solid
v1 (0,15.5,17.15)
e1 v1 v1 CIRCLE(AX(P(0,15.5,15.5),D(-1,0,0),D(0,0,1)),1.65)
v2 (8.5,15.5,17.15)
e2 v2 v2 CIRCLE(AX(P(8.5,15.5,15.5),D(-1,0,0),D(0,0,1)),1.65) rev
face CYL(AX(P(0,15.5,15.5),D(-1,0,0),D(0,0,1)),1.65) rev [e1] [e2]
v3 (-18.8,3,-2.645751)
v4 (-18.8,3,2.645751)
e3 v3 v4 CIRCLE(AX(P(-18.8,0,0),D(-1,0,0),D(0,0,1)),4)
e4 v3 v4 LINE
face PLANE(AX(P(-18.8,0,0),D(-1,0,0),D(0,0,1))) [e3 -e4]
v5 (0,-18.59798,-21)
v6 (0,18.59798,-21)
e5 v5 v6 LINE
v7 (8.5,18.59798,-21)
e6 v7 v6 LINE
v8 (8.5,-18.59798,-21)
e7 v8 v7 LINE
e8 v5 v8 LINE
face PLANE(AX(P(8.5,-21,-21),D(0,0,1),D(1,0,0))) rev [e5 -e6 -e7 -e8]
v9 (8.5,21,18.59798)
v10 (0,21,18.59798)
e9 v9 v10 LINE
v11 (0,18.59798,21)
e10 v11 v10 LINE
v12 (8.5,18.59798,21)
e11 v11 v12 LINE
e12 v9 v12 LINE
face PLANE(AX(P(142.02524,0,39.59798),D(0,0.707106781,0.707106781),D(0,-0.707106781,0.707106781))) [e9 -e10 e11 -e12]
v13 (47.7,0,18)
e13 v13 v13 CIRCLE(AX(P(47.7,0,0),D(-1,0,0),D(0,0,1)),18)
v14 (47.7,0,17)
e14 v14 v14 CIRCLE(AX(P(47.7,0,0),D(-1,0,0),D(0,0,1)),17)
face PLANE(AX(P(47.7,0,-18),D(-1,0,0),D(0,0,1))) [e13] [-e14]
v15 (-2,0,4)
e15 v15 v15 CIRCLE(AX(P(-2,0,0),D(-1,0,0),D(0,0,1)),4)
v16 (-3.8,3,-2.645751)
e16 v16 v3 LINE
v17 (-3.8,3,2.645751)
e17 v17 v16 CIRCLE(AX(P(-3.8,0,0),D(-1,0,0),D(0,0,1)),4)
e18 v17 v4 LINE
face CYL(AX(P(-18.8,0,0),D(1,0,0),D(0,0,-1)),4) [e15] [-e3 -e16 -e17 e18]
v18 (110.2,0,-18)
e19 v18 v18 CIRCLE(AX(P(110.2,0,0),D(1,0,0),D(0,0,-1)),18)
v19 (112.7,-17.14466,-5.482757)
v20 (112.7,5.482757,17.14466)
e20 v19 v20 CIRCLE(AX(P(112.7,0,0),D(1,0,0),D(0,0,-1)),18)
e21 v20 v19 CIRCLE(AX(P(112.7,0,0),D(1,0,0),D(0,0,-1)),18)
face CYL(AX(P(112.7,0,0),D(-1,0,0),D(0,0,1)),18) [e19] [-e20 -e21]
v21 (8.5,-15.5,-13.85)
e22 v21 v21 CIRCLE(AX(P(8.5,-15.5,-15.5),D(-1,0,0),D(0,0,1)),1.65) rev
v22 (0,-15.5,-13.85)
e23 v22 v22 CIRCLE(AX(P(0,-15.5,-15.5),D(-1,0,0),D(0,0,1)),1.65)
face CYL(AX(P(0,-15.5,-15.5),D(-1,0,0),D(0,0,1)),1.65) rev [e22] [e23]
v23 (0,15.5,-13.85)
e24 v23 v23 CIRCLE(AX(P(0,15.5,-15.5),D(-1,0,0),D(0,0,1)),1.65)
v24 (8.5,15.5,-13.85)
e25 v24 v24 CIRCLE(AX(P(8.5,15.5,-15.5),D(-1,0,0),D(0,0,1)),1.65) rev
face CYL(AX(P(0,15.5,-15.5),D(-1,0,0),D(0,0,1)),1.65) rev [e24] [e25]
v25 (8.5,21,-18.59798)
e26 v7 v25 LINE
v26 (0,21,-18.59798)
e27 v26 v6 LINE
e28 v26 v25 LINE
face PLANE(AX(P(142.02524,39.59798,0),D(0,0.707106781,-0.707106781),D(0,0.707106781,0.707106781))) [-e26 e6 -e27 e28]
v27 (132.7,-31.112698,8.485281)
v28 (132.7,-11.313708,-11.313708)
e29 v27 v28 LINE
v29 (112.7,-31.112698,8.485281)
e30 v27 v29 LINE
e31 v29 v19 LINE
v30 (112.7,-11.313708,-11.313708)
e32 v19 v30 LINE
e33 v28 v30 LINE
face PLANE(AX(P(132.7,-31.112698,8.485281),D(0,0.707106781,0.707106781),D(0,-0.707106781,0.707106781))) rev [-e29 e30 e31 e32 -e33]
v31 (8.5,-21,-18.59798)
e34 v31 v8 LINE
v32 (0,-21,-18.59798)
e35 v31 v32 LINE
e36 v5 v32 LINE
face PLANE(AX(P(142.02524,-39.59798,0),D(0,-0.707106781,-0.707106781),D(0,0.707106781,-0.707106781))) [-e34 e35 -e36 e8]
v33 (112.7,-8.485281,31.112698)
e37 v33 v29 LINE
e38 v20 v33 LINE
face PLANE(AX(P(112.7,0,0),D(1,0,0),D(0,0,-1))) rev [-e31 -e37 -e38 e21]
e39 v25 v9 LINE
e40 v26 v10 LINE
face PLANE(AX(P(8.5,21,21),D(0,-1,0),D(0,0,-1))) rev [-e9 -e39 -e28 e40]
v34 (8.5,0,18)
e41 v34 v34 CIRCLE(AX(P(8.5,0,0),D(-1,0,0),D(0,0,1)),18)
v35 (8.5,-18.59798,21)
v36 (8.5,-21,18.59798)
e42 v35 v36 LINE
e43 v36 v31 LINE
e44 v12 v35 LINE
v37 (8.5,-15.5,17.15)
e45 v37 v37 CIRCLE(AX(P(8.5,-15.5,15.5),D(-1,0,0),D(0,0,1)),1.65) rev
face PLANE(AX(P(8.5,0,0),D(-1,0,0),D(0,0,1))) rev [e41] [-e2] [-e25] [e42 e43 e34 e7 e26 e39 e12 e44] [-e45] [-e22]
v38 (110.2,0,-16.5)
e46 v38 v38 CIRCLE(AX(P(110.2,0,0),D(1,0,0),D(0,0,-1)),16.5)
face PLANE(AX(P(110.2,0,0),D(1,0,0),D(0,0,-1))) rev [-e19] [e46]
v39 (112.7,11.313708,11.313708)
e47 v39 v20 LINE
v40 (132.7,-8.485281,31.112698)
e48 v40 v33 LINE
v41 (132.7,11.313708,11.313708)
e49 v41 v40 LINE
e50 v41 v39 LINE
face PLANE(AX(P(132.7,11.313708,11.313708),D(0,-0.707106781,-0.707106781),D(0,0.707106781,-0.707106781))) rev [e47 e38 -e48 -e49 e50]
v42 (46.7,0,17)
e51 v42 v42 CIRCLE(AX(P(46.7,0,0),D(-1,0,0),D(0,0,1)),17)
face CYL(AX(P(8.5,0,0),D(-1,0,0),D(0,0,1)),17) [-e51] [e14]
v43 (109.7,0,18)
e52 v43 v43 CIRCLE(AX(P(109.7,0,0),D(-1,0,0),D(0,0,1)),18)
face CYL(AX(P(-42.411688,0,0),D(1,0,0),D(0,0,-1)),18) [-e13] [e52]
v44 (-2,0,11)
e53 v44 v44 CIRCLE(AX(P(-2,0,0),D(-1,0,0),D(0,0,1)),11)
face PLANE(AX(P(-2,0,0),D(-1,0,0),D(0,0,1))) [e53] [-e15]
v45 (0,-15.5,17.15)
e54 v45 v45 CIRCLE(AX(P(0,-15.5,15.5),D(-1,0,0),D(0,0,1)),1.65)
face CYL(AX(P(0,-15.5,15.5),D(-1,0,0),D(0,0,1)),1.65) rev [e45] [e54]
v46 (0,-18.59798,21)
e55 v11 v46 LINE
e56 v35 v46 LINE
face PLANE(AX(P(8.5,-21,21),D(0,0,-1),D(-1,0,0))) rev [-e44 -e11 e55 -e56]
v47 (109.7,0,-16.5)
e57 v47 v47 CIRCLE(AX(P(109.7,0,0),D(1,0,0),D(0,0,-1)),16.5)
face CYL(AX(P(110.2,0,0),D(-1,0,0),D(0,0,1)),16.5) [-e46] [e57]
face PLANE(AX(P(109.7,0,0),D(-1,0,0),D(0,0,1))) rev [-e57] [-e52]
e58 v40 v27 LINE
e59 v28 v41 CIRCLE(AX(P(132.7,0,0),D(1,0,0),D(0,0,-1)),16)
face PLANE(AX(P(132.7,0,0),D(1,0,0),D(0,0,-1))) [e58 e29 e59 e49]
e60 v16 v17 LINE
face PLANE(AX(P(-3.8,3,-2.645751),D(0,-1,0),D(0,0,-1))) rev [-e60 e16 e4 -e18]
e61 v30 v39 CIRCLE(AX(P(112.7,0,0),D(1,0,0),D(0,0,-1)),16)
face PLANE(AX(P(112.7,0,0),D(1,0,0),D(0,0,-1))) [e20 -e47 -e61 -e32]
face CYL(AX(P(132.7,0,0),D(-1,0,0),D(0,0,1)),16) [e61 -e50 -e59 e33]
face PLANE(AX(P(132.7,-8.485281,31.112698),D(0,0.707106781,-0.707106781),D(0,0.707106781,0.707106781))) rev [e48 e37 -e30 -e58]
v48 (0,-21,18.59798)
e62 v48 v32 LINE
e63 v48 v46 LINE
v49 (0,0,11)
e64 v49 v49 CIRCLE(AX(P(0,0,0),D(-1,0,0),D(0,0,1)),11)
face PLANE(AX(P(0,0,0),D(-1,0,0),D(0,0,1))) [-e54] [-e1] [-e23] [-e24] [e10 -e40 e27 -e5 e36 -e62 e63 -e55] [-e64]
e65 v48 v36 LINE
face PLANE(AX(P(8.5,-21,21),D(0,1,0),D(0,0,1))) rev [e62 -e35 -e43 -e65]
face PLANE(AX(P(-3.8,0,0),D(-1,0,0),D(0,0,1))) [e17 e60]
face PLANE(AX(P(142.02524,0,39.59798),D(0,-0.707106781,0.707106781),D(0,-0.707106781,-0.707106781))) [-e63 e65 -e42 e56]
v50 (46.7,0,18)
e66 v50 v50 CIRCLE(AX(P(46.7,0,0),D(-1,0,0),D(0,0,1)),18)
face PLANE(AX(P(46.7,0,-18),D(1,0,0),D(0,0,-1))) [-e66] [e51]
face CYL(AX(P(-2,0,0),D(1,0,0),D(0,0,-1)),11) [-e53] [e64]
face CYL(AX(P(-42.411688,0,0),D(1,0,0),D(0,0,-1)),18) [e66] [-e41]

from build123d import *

# Parameters (mm, degrees)
SKETCH_1_W                 = 42
SKETCH_1_H                 = 42
EXTRUDE_1_DEPTH            = 8.5
SKETCH_2_R                 = 47.208301361
CUT_EXTRUDE_1_DEPTH        = 8.5
SKETCH_3_R                 = 11
EXTRUDE_2_DEPTH            = 2
SKETCH_4_R                 = 4
EXTRUDE_3_DEPTH            = 16.8
CUT_EXTRUDE_START          = -15
CUT_EXTRUDE_2_DEPTH        = 15
SKETCH_7_R                 = 18
EXTRUDE_4_DEPTH            = 101.2
SKETCH_8_R                 = 16.5
EXTRUDE_5_DEPTH            = 0.5
EXTRUDE_START              = 2.5
SKETCH_9_R                 = 18
EXTRUDE_6_DEPTH            = 2.5
EXTRUDE_7_DEPTH            = 20
HOLE_WIZARD_M4_1_D         = 3.3
PATTERN_LINEAR_1_OUTLINE_R = 1.65
PATTERN_LINEAR_1_DEPTH     = 8.5
SKETCH_13_W                = 1
SKETCH_13_H                = 1


# Read off the part's stored shape, not the designer's step: 阵列(线性)1
with BuildPart() as part:
    # 草图1 → 凸台-拉伸1 (new body)
    with BuildSketch(Plane(origin=(0, 0, 0), x_dir=(0, 0, -1), z_dir=(1, 0, 0))):
        Rectangle(SKETCH_1_W, SKETCH_1_H)
    extrude(amount=EXTRUDE_1_DEPTH)

    # 草图2 → 切除-拉伸1 (cut)
    with BuildSketch(Plane.ZY):
        Circle(SKETCH_2_R)
        Polygon((39.597979746, 0), (0, 39.597979746), (-39.597979746, 0), (0, -39.597979746), align=None, mode=Mode.SUBTRACT)
    extrude(amount=-CUT_EXTRUDE_1_DEPTH, mode=Mode.SUBTRACT)

    # 草图3 → 凸台-拉伸2 (add)
    with BuildSketch(Plane.ZY):
        Circle(SKETCH_3_R)
    extrude(amount=EXTRUDE_2_DEPTH)

    # 草图4 → 凸台-拉伸3 (add)
    with BuildSketch(Plane.ZY.offset(2)):
        Circle(SKETCH_4_R)
    extrude(amount=EXTRUDE_3_DEPTH)

    # 草图5 → 切除-拉伸2 (cut)
    with BuildSketch(Plane.ZY.offset(18.8).offset(CUT_EXTRUDE_START)):
        with BuildLine():
            Line((-2.645751311, 3), (2.645751311, 3))
            ThreePointArc((2.645751311, 3), (0, 4), (-2.645751311, 3))
        make_face()
    extrude(amount=CUT_EXTRUDE_2_DEPTH, mode=Mode.SUBTRACT)

    # 草图7 → 凸台-拉伸4 (add)
    with BuildSketch(Plane.ZY.offset(-109.7)):
        Circle(SKETCH_7_R)
    extrude(amount=EXTRUDE_4_DEPTH)

    # 草图8 → 凸台-拉伸5 (add)
    with BuildSketch(Plane(origin=(109.7, 0, 0), x_dir=(0, 0, -1), z_dir=(1, 0, 0))):
        Circle(SKETCH_8_R)
    extrude(amount=EXTRUDE_5_DEPTH)

    # 草图9 → 凸台-拉伸6 (add)
    with BuildSketch(Plane(origin=(110.2, 0, 0), x_dir=(0, 0, -1), z_dir=(1, 0, 0)).offset(EXTRUDE_START)):
        with Locations(Location((0, 0, 0), (0, 0, 180))):
            Circle(SKETCH_9_R)
    extrude(amount=-EXTRUDE_6_DEPTH)

    # 草图10 → 凸台-拉伸7 (add)
    with BuildSketch(Plane(origin=(112.7, 0, 0), x_dir=(0, 0, -1), z_dir=(1, 0, 0))):
        with BuildLine():
            Line((-11.313708499, 11.313708499), (-31.112698372, -8.485281374))
            Line((-31.112698372, -8.485281374), (-8.485281374, -31.112698372))
            Line((-8.485281374, -31.112698372), (11.313708499, -11.313708499))
            ThreePointArc((11.313708499, -11.313708499), (11.313708499, 11.313708499), (-11.313708499, 11.313708499))
        make_face()
    extrude(amount=EXTRUDE_7_DEPTH)

    # M4 螺纹孔1 (through all)
    with Locations(Plane(origin=(0, 15.5, -15.5), x_dir=(0, 0, -1), z_dir=(-1, 0, 0))):
        with Locations((0, 0)):
            Hole(HOLE_WIZARD_M4_1_D / 2)

    # 阵列(线性)1 outline → 阵列(线性)1 (cut)
    with BuildSketch(Plane.YZ):
        with Locations((-15.5, -15.5)):
            Circle(PATTERN_LINEAR_1_OUTLINE_R)
        with Locations((15.5, 15.5)):
            Circle(PATTERN_LINEAR_1_OUTLINE_R)
        with Locations((-15.5, 15.5)):
            Circle(PATTERN_LINEAR_1_OUTLINE_R)
    extrude(amount=PATTERN_LINEAR_1_DEPTH, mode=Mode.SUBTRACT)

    # 草图13 → 切除-旋转1 (revolve, cut)
    with BuildSketch(Plane(origin=(0, 0, 0), x_dir=(1, 0, 0), z_dir=(0, 1, 0)), mode=Mode.PRIVATE) as cut_revolve_1_sk:
        with Locations((47.2, 17.5)):
            Rectangle(SKETCH_13_W, SKETCH_13_H)
    revolve(cut_revolve_1_sk.sketch.rotate(Axis((8.5, 0, 0), (1, 0, 0)), 180), axis=Axis((8.5, 0, 0), (1, 0, 0)), mode=Mode.SUBTRACT)


solid = part.part
